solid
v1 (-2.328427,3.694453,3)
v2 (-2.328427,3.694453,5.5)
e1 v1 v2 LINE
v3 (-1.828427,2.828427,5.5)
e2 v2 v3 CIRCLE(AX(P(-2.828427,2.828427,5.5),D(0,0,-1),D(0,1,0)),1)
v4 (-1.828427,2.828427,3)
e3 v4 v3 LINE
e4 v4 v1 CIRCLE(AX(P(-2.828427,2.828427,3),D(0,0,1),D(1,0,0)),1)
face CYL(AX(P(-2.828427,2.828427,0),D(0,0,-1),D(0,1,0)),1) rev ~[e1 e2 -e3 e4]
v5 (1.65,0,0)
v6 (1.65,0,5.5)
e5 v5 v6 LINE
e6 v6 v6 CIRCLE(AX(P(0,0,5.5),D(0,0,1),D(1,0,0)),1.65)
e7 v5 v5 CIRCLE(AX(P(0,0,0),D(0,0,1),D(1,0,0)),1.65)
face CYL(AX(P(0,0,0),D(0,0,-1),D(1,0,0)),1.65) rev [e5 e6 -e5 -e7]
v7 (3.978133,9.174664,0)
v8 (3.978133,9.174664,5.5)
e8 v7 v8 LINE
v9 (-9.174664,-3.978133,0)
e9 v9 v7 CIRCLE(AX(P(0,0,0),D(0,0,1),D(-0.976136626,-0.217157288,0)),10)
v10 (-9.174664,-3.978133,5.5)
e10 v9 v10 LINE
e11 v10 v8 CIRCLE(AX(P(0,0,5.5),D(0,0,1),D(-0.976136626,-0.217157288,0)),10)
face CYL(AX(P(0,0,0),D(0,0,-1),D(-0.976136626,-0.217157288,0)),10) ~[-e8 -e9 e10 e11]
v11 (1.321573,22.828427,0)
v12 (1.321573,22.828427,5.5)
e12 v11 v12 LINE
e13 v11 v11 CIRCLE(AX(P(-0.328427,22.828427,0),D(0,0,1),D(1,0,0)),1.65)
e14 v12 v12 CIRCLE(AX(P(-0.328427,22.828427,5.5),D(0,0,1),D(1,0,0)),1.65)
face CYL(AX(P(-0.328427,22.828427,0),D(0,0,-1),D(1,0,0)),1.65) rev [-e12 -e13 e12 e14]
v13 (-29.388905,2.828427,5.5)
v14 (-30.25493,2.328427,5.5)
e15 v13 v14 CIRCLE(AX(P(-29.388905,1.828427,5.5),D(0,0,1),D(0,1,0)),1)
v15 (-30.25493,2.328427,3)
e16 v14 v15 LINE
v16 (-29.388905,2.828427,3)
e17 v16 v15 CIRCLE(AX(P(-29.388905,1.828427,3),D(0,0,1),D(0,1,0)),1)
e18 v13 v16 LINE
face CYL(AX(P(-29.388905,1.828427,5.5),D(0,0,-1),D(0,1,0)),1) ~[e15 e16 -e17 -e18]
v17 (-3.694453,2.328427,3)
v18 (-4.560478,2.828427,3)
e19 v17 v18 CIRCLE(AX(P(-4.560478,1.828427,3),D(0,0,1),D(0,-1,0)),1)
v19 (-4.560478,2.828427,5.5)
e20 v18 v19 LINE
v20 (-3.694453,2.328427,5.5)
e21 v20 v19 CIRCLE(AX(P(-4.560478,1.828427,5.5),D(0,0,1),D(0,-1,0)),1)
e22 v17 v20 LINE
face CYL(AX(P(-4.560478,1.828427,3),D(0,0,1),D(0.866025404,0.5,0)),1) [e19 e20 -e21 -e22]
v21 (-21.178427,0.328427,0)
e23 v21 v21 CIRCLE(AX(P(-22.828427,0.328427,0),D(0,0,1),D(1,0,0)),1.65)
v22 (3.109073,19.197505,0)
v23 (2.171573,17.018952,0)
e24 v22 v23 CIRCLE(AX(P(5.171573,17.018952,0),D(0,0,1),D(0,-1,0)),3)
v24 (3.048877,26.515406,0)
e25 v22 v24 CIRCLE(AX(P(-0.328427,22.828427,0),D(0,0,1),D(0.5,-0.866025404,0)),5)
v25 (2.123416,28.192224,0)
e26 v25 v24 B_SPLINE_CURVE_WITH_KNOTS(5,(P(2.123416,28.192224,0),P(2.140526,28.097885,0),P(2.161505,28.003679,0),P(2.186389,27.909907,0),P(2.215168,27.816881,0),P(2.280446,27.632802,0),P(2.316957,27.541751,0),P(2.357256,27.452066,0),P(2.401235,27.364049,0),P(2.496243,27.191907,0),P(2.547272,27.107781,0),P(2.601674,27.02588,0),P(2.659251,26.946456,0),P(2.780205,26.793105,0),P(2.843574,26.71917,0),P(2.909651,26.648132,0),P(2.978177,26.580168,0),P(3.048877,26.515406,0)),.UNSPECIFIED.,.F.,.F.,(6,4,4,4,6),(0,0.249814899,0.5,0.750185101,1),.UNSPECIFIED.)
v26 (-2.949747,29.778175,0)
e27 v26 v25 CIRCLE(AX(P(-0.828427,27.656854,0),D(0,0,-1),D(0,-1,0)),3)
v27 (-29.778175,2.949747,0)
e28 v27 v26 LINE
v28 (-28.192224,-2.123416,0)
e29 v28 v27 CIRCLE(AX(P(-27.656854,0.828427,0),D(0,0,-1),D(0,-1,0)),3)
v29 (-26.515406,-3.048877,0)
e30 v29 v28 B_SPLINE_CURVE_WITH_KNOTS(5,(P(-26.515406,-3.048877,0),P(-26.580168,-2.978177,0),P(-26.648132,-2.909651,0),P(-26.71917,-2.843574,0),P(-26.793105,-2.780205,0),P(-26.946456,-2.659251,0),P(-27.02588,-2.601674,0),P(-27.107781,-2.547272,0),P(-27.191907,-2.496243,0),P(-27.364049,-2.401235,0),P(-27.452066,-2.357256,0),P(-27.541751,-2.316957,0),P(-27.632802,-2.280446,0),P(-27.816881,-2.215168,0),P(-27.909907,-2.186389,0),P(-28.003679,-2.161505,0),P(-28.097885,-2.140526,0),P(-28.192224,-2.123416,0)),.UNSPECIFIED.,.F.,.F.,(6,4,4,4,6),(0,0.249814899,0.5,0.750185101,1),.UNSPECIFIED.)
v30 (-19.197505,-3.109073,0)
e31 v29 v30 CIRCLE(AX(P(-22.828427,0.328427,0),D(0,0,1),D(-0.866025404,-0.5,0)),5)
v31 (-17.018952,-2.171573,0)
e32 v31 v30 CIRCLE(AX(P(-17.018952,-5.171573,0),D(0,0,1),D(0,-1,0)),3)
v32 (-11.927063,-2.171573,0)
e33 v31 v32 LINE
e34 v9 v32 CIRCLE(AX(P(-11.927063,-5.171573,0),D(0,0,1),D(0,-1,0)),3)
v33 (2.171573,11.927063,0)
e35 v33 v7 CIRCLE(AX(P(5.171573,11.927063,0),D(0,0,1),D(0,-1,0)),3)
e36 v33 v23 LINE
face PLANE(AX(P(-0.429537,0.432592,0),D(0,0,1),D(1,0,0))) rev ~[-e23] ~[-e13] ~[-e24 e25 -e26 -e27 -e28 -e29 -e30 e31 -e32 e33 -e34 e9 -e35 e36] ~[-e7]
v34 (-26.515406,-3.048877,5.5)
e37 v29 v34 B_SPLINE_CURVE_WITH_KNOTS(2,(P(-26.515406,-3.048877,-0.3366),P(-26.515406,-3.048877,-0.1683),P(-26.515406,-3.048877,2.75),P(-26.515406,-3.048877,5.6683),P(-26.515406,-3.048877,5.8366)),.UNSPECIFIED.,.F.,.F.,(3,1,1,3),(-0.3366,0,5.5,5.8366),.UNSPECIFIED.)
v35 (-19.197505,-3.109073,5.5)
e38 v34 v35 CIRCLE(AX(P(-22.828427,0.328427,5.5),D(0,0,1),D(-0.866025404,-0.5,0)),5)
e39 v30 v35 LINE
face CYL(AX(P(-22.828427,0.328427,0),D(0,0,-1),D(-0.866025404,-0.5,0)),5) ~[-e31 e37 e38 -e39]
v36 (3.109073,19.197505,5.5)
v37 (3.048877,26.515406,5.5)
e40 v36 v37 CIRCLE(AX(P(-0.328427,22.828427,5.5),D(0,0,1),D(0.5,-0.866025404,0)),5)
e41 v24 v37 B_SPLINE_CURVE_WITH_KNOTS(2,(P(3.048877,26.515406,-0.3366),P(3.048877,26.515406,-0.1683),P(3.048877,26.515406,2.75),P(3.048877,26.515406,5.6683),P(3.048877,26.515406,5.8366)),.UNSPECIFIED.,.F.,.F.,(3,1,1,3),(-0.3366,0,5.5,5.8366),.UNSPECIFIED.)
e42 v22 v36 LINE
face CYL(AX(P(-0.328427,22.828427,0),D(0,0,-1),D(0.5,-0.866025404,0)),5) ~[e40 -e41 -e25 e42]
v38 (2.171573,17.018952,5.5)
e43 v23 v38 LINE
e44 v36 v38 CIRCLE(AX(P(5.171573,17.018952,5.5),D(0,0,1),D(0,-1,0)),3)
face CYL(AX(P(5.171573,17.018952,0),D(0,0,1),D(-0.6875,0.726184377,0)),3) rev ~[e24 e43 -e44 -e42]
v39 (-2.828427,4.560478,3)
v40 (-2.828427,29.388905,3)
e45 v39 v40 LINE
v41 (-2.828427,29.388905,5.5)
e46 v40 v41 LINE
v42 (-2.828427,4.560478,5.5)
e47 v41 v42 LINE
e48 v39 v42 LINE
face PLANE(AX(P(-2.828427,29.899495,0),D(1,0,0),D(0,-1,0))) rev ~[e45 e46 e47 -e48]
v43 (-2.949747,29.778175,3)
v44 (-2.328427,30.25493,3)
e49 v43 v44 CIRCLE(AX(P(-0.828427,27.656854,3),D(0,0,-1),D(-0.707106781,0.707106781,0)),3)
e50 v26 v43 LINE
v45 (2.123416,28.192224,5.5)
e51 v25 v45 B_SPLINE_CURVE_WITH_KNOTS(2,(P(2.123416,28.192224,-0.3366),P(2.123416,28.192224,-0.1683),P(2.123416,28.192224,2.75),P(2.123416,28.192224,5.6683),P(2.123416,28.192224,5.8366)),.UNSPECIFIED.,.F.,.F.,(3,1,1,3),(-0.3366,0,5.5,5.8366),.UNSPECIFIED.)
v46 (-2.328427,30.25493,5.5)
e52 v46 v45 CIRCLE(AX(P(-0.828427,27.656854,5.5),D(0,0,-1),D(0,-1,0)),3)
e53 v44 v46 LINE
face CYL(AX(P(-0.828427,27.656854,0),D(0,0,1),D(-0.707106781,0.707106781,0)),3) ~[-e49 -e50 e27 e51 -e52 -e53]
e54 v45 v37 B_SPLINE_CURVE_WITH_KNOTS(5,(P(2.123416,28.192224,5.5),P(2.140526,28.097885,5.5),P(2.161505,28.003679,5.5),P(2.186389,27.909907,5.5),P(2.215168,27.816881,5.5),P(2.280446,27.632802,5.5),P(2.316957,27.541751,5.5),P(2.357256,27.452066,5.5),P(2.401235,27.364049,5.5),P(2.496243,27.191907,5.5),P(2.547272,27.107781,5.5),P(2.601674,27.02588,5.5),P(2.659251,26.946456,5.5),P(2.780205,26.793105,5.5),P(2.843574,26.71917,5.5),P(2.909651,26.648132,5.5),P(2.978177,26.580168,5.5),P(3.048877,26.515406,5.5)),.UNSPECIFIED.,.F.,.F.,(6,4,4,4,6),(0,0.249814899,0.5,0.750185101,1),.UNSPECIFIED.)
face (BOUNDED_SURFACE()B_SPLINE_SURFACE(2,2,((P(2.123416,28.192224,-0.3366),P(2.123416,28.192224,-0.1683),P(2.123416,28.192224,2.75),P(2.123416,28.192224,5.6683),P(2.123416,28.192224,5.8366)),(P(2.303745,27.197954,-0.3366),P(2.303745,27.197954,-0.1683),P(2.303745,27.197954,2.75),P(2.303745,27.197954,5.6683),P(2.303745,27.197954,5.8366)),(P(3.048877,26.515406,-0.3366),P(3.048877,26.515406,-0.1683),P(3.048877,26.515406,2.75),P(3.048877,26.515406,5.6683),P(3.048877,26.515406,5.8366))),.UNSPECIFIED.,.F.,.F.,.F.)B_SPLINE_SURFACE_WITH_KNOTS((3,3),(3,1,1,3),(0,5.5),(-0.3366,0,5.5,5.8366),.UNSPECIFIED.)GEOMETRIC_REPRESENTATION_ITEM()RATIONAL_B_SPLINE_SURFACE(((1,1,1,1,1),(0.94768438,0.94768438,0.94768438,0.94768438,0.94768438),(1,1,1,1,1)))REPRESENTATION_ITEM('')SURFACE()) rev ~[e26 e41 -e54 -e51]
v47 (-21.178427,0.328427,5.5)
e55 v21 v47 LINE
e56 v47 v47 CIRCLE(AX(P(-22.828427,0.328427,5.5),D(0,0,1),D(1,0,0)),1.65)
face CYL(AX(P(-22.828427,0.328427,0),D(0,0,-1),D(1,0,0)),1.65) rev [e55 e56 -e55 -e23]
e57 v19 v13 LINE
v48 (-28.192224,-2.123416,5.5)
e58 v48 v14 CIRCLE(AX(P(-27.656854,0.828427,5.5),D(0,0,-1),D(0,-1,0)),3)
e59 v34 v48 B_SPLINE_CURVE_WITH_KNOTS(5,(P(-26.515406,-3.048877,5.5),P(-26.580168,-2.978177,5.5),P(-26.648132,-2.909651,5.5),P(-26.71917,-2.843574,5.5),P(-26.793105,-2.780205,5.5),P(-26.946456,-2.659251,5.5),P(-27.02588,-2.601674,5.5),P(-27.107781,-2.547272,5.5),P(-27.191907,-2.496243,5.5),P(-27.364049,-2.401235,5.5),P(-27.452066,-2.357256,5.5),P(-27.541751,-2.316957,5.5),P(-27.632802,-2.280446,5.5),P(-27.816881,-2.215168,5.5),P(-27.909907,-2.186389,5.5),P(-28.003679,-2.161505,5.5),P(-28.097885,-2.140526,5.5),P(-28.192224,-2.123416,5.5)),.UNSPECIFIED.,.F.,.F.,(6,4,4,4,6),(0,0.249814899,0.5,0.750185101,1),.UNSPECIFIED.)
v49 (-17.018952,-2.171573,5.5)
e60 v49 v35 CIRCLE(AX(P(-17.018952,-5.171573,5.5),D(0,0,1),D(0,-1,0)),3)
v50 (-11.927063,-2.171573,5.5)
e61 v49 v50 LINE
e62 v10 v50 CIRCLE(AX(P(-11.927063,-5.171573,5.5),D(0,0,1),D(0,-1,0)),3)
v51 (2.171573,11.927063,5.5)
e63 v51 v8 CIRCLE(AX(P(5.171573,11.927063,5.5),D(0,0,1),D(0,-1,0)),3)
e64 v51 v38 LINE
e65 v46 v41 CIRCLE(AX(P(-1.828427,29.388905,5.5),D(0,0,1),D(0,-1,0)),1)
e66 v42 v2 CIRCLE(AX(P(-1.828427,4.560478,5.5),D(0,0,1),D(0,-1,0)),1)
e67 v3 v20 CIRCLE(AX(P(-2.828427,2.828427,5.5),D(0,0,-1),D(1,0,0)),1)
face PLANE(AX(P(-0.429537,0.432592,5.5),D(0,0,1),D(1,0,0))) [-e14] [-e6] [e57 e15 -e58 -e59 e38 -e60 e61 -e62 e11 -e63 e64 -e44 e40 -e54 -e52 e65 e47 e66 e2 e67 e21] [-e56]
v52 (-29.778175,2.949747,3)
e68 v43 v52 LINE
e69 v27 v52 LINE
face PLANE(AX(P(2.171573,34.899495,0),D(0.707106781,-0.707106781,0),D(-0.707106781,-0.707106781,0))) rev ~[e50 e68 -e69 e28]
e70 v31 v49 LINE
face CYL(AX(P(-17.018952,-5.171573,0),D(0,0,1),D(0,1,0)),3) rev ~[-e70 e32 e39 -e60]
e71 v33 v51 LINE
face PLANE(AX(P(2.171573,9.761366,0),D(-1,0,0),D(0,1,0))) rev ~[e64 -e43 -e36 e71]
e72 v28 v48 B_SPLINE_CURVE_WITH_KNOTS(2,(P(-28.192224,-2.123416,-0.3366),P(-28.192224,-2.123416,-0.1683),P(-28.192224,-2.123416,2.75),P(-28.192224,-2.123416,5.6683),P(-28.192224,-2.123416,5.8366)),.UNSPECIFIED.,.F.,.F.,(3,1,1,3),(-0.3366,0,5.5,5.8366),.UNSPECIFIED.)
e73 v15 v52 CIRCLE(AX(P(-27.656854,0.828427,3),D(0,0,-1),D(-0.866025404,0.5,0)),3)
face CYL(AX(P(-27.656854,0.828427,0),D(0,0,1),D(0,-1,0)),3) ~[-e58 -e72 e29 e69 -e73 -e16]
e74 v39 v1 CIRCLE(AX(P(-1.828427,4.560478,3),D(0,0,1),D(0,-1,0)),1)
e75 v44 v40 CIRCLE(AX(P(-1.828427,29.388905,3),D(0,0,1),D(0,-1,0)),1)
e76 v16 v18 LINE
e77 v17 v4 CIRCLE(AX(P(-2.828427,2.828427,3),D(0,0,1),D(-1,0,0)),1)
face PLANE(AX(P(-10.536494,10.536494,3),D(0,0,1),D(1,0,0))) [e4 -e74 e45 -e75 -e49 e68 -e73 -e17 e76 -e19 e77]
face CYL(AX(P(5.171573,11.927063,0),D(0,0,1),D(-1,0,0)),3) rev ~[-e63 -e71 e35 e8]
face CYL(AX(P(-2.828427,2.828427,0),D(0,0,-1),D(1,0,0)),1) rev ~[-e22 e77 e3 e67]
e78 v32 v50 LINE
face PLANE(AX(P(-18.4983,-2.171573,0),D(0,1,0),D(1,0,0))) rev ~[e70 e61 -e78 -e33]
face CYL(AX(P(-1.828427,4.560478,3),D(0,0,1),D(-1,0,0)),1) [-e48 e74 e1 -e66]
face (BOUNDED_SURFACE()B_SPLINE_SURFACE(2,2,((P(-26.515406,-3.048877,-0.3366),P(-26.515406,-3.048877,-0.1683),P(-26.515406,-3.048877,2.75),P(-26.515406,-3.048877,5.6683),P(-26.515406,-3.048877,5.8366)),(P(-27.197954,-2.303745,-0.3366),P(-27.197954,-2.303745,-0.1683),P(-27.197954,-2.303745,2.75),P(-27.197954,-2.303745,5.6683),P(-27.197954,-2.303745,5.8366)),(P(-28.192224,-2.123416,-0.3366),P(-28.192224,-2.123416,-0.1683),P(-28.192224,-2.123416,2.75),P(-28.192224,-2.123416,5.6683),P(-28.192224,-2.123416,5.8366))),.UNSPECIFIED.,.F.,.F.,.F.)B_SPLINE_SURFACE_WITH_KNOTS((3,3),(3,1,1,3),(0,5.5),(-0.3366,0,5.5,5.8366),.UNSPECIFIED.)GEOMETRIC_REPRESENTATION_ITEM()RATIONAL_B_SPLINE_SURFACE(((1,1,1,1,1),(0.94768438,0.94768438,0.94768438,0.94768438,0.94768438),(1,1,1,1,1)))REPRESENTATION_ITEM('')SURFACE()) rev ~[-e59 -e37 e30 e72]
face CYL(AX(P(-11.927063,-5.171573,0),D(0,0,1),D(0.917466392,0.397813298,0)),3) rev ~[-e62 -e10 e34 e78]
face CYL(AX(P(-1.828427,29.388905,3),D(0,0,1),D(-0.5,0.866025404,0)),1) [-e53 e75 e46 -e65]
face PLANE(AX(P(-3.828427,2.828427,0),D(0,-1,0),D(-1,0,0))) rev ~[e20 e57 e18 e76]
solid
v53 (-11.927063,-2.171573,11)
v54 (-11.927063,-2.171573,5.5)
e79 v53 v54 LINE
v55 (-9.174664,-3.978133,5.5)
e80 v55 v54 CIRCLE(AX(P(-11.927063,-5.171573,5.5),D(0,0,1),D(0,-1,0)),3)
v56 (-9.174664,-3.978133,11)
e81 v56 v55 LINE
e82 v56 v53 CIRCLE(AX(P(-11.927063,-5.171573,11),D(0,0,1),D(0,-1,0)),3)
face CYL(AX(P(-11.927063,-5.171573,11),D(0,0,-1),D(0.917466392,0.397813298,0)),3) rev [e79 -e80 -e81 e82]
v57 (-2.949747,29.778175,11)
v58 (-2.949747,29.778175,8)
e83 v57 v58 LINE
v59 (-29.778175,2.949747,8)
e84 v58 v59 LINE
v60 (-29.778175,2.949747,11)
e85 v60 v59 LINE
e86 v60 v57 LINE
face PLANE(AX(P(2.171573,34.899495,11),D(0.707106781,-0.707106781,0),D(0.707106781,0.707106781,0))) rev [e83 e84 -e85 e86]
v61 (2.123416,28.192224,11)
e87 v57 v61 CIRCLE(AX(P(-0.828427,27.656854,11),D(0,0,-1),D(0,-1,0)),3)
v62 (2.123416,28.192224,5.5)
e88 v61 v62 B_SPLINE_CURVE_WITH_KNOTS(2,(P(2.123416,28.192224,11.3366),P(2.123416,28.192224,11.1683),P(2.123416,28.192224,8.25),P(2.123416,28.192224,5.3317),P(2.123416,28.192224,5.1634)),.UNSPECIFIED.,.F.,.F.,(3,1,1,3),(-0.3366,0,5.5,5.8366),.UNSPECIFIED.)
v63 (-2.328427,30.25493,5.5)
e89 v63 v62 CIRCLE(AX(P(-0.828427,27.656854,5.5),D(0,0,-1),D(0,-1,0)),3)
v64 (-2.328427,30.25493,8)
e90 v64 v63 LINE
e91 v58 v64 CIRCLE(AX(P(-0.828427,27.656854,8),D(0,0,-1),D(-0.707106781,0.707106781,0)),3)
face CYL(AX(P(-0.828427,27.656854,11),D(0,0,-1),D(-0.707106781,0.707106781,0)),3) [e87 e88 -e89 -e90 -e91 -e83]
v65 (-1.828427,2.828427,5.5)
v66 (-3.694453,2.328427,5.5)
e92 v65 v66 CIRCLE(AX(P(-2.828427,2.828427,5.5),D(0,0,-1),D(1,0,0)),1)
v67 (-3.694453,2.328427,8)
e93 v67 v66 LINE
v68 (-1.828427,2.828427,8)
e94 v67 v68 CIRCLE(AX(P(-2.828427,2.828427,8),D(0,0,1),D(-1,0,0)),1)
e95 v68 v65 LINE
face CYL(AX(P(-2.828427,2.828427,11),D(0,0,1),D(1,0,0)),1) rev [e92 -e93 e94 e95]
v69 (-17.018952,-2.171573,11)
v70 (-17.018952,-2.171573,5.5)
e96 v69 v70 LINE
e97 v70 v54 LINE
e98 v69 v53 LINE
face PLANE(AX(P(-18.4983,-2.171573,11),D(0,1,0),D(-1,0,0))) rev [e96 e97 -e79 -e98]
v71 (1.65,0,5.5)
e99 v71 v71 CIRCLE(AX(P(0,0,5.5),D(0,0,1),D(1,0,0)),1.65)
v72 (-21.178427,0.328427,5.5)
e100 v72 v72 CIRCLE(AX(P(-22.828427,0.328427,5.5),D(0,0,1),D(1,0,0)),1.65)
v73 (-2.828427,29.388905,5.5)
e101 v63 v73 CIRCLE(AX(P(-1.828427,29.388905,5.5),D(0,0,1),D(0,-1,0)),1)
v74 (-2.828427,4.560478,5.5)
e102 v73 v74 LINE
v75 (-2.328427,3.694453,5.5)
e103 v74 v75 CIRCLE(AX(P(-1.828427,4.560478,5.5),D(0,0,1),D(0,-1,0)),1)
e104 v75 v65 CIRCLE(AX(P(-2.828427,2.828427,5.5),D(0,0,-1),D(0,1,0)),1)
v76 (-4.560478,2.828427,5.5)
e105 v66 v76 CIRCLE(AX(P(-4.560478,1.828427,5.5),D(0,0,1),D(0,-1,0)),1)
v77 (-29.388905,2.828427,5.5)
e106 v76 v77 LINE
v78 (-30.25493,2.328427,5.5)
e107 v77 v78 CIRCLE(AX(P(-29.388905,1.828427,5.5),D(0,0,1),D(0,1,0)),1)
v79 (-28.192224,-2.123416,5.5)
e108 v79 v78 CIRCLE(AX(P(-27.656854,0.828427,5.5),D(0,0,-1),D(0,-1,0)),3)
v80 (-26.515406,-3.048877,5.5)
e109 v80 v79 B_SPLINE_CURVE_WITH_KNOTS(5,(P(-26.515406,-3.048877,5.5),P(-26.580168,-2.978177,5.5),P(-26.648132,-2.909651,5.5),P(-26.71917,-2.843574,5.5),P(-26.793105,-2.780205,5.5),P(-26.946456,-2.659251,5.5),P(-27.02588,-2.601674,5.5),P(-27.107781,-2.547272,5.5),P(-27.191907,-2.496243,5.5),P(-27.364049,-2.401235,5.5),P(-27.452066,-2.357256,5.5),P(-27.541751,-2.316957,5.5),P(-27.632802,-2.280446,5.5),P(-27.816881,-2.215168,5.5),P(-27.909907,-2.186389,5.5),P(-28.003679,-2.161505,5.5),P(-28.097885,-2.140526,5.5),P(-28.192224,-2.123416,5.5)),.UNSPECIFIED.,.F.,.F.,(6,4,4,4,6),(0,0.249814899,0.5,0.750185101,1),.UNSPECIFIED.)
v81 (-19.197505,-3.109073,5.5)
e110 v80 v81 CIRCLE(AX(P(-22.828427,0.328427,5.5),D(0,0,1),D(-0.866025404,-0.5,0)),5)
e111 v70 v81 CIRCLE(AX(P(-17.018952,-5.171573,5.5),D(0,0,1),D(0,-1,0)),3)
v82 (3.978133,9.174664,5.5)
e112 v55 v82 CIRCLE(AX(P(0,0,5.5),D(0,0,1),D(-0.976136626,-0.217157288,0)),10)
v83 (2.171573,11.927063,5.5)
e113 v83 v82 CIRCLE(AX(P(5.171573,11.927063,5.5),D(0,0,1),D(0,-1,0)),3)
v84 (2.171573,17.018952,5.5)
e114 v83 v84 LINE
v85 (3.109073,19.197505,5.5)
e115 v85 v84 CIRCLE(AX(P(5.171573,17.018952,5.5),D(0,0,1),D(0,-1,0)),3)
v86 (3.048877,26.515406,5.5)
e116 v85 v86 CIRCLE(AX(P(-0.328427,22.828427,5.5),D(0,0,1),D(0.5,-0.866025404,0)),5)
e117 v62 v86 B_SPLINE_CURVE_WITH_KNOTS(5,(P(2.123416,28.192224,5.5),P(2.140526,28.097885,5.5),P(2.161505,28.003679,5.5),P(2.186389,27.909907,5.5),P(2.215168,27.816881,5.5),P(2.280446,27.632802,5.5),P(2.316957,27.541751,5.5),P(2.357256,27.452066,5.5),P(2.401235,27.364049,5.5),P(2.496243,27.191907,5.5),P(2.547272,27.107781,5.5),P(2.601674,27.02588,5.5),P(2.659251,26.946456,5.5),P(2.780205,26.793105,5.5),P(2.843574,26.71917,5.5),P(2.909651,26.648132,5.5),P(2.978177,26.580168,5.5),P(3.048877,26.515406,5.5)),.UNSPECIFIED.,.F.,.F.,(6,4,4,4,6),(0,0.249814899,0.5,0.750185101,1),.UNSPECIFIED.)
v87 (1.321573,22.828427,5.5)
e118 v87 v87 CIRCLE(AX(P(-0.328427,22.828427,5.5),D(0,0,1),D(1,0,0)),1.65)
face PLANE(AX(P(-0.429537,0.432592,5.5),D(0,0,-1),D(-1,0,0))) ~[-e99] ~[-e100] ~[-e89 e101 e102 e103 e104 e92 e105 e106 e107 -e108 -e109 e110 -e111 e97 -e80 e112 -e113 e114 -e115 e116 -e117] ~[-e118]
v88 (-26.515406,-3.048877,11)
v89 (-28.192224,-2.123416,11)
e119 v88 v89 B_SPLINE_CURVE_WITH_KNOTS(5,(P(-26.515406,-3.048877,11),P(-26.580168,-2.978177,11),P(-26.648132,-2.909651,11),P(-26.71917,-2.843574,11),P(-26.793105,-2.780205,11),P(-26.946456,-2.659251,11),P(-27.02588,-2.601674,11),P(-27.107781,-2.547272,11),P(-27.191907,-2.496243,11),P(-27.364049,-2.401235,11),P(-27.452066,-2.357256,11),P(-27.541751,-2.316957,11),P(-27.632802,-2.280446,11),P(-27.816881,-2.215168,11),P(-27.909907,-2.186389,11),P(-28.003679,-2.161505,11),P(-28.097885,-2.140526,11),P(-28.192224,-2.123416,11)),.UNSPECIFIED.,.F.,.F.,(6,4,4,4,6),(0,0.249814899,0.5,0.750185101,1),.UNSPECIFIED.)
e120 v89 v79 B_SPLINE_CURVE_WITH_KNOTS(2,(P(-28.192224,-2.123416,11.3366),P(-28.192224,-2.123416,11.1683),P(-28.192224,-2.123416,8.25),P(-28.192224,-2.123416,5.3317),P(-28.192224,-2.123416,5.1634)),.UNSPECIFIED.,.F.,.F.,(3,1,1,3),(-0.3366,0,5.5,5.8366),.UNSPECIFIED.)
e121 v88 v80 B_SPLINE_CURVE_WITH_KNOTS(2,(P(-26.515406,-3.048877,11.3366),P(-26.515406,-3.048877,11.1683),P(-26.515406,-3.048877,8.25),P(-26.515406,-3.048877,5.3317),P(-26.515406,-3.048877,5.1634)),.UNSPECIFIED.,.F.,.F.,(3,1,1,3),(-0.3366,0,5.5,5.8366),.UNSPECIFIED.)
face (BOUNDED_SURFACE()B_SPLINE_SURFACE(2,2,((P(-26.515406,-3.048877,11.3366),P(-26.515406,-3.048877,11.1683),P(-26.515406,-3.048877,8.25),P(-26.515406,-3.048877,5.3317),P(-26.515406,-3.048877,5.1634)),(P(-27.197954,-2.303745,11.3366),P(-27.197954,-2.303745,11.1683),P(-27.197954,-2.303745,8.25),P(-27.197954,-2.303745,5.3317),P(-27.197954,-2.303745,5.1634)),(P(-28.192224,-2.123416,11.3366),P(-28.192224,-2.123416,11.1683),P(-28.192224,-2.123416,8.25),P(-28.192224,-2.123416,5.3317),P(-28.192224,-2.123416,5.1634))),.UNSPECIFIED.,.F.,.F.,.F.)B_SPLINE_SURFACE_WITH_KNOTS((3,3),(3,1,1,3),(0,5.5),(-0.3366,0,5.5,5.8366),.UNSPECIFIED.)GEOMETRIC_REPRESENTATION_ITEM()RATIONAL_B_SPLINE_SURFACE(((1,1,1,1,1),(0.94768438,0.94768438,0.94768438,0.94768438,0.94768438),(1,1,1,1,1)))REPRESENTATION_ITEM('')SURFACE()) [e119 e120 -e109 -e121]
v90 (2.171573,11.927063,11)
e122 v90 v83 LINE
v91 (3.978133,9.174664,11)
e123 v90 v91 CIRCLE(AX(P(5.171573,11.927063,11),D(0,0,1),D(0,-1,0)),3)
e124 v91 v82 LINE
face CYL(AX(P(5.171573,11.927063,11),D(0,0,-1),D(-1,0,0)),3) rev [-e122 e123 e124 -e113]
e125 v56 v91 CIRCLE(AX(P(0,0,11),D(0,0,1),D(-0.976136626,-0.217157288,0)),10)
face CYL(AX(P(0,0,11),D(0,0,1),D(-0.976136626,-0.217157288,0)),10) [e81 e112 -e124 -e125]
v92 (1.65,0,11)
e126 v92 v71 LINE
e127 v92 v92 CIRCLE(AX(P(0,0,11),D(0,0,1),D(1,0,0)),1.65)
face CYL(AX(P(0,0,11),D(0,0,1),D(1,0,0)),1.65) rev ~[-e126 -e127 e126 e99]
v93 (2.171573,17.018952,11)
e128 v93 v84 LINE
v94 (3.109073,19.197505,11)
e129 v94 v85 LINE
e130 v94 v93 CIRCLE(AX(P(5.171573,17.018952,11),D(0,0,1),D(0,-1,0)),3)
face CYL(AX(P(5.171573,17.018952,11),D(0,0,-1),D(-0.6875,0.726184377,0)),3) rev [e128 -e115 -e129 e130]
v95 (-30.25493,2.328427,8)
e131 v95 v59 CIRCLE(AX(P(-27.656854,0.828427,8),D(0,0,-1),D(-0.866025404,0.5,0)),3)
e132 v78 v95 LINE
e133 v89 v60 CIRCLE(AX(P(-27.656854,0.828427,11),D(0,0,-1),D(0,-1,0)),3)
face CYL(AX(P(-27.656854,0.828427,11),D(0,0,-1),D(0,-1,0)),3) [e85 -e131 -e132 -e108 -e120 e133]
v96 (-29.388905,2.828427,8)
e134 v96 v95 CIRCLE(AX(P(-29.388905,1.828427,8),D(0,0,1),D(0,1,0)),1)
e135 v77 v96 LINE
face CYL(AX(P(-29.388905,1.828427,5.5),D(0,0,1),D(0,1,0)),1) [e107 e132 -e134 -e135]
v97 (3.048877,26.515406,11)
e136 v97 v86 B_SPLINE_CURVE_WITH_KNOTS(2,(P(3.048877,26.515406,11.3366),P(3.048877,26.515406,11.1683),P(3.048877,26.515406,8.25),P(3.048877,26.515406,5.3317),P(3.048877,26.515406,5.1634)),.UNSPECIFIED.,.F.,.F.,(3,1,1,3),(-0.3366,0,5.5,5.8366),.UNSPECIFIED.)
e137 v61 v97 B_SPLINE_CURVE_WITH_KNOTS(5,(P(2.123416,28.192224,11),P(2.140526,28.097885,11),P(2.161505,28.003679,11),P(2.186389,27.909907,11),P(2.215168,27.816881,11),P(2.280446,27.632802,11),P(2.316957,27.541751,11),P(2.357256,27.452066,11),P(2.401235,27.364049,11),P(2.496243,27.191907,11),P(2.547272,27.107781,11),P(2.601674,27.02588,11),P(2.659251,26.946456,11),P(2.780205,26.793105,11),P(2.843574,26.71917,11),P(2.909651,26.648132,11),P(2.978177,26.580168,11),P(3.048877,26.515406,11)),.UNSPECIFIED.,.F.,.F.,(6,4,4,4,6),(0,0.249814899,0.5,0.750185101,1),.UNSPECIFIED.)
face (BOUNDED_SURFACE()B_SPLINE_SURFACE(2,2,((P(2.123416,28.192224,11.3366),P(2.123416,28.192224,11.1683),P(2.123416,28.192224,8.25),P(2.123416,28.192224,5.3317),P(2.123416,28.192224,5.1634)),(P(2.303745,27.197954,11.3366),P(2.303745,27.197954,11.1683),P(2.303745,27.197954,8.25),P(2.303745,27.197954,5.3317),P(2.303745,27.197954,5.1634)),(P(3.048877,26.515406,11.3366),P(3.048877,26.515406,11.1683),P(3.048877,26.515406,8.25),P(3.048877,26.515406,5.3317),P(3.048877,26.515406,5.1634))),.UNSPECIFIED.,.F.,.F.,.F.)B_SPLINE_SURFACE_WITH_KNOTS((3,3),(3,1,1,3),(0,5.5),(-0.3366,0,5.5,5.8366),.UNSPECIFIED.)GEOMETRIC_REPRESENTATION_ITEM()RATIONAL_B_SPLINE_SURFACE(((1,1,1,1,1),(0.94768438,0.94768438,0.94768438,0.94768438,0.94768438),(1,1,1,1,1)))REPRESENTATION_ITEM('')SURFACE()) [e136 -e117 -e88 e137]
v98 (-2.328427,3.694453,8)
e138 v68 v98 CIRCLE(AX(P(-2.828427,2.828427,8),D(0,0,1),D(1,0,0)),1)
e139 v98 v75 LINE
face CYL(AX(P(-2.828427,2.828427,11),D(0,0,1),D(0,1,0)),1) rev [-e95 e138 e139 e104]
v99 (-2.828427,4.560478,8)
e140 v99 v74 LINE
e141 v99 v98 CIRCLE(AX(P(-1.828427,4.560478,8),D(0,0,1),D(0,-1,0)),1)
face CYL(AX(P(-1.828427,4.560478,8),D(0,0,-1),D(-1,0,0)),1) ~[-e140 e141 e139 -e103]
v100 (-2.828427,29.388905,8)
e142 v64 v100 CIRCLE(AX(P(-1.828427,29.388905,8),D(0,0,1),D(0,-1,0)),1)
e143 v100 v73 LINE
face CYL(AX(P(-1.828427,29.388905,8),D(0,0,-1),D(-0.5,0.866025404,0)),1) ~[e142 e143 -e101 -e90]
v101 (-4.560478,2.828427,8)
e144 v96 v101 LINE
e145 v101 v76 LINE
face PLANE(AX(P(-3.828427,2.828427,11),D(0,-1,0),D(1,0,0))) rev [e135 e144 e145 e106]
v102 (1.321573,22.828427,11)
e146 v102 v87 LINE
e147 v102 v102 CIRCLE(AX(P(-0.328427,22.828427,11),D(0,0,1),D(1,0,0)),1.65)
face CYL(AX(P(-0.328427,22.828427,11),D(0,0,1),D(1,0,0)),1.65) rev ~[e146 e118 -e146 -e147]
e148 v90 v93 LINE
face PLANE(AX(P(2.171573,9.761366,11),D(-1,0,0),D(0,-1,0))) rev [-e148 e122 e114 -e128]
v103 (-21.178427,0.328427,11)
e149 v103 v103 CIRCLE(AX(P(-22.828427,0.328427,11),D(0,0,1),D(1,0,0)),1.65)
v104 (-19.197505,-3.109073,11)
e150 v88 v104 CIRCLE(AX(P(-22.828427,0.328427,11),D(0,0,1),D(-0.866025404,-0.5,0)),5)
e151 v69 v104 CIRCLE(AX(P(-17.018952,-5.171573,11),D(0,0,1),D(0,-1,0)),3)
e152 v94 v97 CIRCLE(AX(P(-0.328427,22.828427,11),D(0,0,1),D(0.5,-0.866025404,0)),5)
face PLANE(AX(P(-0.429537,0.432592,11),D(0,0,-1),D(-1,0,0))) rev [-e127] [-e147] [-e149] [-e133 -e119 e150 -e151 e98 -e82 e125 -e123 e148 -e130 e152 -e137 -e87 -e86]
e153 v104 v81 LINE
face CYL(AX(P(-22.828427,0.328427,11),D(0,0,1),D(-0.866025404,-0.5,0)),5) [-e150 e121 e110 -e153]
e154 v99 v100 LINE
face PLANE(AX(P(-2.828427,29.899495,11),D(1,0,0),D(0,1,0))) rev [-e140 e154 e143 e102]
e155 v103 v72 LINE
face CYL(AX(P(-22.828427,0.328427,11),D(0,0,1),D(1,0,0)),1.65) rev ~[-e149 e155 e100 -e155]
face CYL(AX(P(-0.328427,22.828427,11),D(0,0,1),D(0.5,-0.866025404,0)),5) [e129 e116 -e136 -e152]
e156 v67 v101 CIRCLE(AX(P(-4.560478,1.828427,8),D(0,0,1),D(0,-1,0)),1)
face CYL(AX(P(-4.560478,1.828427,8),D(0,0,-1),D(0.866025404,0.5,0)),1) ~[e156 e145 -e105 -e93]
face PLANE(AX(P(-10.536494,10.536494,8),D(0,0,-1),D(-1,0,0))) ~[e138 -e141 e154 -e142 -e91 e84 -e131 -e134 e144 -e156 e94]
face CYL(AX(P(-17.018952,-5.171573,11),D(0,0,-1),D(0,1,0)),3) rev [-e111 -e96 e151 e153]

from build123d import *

# Parameters (mm, degrees)
F1_DEPTH = 3
F0_R     = 1.65
F2_DEPTH = 5.5
F3_R     = 3
F4_R     = 3
F5_R     = 1


# Not quite as in the source:
# - a feature names something its author has since deleted; it is built from what else it names


with BuildPart() as f1:
    # F0 (on Top) → F1 (new body)
    with BuildSketch(Plane.XY):
        with BuildLine():
            ThreePointArc((-9.5916630466, 2.8284271247), (-7.0710678119, 7.0710678119), (-2.8284271247, 9.5916630466))
            Line((-2.8284271247, 9.5916630466), (-2.8284271247, 22.8284271247))
            Line((-2.8284271247, 22.8284271247), (-22.8284271247, 2.8284271247))
            Line((-22.8284271247, 2.8284271247), (-9.5916630466, 2.8284271247))
        make_face()
        with BuildLine():
            Line((-2.8284271247, 3.8284271247), (-2.8284271247, 9.5916630466))
            ThreePointArc((-2.8284271247, 9.5916630466), (-7.0710678119, 7.0710678119), (-9.5916630466, 2.8284271247))
            Line((-9.5916630466, 2.8284271247), (-3.8284271247, 2.8284271247))
            ThreePointArc((-3.8284271247, 2.8284271247), (-3.5355339059, 3.5355339059), (-2.8284271247, 3.8284271247))
        make_face()
        Polygon((-22.8284271247, 2.8284271247), (-2.8284271247, 22.8284271247), (-2.8284271247, 29.8994949366), (-29.8994949366, 2.8284271247), align=None)
        with BuildLine():
            ThreePointArc((-1.8284271247, 2.8284271247), (-2.1213203436, 3.5355339059), (-2.8284271247, 3.8284271247))
            Line((-2.8284271247, 3.8284271247), (-2.8284271247, 2.8284271247))
            Line((-2.8284271247, 2.8284271247), (-3.8284271247, 2.8284271247))
            ThreePointArc((-3.8284271247, 2.8284271247), (-2.8284271247, 1.8284271247), (-1.8284271247, 2.8284271247))
        make_face()
        with BuildLine():
            Line((-2.8284271247, 2.8284271247), (-2.8284271247, 3.8284271247))
            ThreePointArc((-2.8284271247, 3.8284271247), (-3.5355339059, 3.5355339059), (-3.8284271247, 2.8284271247))
            Line((-3.8284271247, 2.8284271247), (-2.8284271247, 2.8284271247))
        make_face()
    extrude(amount=F1_DEPTH)

    # F0 (on Top) → F2 (join)
    with BuildSketch(Plane.XY):
        with BuildLine():
            ThreePointArc((-9.7613662593, -2.1715728753), (1.0923226189, -9.9401625387), (10, 0))
            ThreePointArc((10, 0), (7.8011450683, 6.2563676062), (2.1715728753, 9.7613662593))
            ThreePointArc((2.1715728753, 9.7613662593), (-0.3392111015, 9.9942451355), (-2.8284271247, 9.5916630466))
            Line((-2.8284271247, 9.5916630466), (-2.8284271247, 3.8284271247))
            ThreePointArc((-2.8284271247, 3.8284271247), (-2.1213203436, 3.5355339059), (-1.8284271247, 2.8284271247))
            ThreePointArc((-1.8284271247, 2.8284271247), (-2.8284271247, 1.8284271247), (-3.8284271247, 2.8284271247))
            Line((-3.8284271247, 2.8284271247), (-9.5916630466, 2.8284271247))
            ThreePointArc((-9.5916630466, 2.8284271247), (-9.9942451355, 0.3392111015), (-9.7613662593, -2.1715728753))
        make_face()
        Circle(F0_R, mode=Mode.SUBTRACT)
        with BuildLine():
            ThreePointArc((-2.8284271247, 9.5916630466), (-0.3392111015, 9.9942451355), (2.1715728753, 9.7613662593))
            Line((2.1715728753, 9.7613662593), (2.1715728753, 18.4983001058))
            Line((2.1715728753, 18.4983001058), (2.1715728753, 27.1585541437))
            Line((2.1715728753, 27.1585541437), (2.1715728753, 34.8994949366))
            Line((2.1715728753, 34.8994949366), (-2.8284271247, 29.8994949366))
            Line((-2.8284271247, 29.8994949366), (-2.8284271247, 22.8284271247))
            Line((-2.8284271247, 22.8284271247), (-2.8284271247, 9.5916630466))
        make_face()
        with Locations((-0.3284271247, 22.8284271247)):
            Circle(F0_R, mode=Mode.SUBTRACT)
        with BuildLine():
            Line((-18.4983001058, -2.1715728753), (-9.7613662593, -2.1715728753))
            ThreePointArc((-9.7613662593, -2.1715728753), (-9.9942451355, 0.3392111015), (-9.5916630466, 2.8284271247))
            Line((-9.5916630466, 2.8284271247), (-22.8284271247, 2.8284271247))
            Line((-22.8284271247, 2.8284271247), (-29.8994949366, 2.8284271247))
            Line((-29.8994949366, 2.8284271247), (-34.8994949366, -2.1715728753))
            Line((-34.8994949366, -2.1715728753), (-27.1585541437, -2.1715728753))
            Line((-27.1585541437, -2.1715728753), (-18.4983001058, -2.1715728753))
        make_face()
        with Locations((-22.8284271247, 0.3284271247)):
            Circle(F0_R, mode=Mode.SUBTRACT)
        with BuildLine():
            ThreePointArc((-27.1585541437, -2.1715728753), (-22.8284271247, -4.6715728753), (-18.4983001058, -2.1715728753))
            Line((-18.4983001058, -2.1715728753), (-27.1585541437, -2.1715728753))
        make_face()
        with BuildLine():
            Line((2.1715728753, 27.1585541437), (2.1715728753, 18.4983001058))
            ThreePointArc((2.1715728753, 18.4983001058), (4.6715728753, 22.8284271247), (2.1715728753, 27.1585541437))
        make_face()
    extrude(amount=F2_DEPTH)

    # F3
    f3_edges = [f1.edges().sort_by_distance(p)[0] for p in [
        (2.171573, 34.899495, 2.75),
        (-34.899495, -2.171573, 2.75),
    ]]
    fillet(f3_edges, radius=F3_R)

    # F4
    f4_edges = [f1.edges().sort_by_distance(p)[0] for p in [
        (-9.761366, -2.171573, 2.75),
        (2.171573, 9.761366, 2.75),
        (-27.158554, -2.171573, 2.75),
        (2.171573, 27.158554, 2.75),
        (-18.4983, -2.171573, 2.75),
        (2.171573, 18.4983, 2.75),
    ]]
    fillet(f4_edges, radius=F4_R)

    # F5
    f5_edges = [f1.edges().sort_by_distance(p)[0] for p in [
        (-2.828427, 29.892922, 4.25),
        (-29.892922, 2.828427, 4.25),
        (-2.828427, 3.828427, 4.25),
        (-3.828427, 2.828427, 4.25),
    ]]
    fillet(f5_edges, radius=F5_R)


with BuildPart() as f6_1:
    # F6: instance of F1
    add(f1.part.mirror(Plane(origin=(-4.0944807871, 4.0944807939, 5.5), x_dir=(1, 0, 0), z_dir=(0, 0, 1))))


solid = Compound([f1.part, f6_1.part])
